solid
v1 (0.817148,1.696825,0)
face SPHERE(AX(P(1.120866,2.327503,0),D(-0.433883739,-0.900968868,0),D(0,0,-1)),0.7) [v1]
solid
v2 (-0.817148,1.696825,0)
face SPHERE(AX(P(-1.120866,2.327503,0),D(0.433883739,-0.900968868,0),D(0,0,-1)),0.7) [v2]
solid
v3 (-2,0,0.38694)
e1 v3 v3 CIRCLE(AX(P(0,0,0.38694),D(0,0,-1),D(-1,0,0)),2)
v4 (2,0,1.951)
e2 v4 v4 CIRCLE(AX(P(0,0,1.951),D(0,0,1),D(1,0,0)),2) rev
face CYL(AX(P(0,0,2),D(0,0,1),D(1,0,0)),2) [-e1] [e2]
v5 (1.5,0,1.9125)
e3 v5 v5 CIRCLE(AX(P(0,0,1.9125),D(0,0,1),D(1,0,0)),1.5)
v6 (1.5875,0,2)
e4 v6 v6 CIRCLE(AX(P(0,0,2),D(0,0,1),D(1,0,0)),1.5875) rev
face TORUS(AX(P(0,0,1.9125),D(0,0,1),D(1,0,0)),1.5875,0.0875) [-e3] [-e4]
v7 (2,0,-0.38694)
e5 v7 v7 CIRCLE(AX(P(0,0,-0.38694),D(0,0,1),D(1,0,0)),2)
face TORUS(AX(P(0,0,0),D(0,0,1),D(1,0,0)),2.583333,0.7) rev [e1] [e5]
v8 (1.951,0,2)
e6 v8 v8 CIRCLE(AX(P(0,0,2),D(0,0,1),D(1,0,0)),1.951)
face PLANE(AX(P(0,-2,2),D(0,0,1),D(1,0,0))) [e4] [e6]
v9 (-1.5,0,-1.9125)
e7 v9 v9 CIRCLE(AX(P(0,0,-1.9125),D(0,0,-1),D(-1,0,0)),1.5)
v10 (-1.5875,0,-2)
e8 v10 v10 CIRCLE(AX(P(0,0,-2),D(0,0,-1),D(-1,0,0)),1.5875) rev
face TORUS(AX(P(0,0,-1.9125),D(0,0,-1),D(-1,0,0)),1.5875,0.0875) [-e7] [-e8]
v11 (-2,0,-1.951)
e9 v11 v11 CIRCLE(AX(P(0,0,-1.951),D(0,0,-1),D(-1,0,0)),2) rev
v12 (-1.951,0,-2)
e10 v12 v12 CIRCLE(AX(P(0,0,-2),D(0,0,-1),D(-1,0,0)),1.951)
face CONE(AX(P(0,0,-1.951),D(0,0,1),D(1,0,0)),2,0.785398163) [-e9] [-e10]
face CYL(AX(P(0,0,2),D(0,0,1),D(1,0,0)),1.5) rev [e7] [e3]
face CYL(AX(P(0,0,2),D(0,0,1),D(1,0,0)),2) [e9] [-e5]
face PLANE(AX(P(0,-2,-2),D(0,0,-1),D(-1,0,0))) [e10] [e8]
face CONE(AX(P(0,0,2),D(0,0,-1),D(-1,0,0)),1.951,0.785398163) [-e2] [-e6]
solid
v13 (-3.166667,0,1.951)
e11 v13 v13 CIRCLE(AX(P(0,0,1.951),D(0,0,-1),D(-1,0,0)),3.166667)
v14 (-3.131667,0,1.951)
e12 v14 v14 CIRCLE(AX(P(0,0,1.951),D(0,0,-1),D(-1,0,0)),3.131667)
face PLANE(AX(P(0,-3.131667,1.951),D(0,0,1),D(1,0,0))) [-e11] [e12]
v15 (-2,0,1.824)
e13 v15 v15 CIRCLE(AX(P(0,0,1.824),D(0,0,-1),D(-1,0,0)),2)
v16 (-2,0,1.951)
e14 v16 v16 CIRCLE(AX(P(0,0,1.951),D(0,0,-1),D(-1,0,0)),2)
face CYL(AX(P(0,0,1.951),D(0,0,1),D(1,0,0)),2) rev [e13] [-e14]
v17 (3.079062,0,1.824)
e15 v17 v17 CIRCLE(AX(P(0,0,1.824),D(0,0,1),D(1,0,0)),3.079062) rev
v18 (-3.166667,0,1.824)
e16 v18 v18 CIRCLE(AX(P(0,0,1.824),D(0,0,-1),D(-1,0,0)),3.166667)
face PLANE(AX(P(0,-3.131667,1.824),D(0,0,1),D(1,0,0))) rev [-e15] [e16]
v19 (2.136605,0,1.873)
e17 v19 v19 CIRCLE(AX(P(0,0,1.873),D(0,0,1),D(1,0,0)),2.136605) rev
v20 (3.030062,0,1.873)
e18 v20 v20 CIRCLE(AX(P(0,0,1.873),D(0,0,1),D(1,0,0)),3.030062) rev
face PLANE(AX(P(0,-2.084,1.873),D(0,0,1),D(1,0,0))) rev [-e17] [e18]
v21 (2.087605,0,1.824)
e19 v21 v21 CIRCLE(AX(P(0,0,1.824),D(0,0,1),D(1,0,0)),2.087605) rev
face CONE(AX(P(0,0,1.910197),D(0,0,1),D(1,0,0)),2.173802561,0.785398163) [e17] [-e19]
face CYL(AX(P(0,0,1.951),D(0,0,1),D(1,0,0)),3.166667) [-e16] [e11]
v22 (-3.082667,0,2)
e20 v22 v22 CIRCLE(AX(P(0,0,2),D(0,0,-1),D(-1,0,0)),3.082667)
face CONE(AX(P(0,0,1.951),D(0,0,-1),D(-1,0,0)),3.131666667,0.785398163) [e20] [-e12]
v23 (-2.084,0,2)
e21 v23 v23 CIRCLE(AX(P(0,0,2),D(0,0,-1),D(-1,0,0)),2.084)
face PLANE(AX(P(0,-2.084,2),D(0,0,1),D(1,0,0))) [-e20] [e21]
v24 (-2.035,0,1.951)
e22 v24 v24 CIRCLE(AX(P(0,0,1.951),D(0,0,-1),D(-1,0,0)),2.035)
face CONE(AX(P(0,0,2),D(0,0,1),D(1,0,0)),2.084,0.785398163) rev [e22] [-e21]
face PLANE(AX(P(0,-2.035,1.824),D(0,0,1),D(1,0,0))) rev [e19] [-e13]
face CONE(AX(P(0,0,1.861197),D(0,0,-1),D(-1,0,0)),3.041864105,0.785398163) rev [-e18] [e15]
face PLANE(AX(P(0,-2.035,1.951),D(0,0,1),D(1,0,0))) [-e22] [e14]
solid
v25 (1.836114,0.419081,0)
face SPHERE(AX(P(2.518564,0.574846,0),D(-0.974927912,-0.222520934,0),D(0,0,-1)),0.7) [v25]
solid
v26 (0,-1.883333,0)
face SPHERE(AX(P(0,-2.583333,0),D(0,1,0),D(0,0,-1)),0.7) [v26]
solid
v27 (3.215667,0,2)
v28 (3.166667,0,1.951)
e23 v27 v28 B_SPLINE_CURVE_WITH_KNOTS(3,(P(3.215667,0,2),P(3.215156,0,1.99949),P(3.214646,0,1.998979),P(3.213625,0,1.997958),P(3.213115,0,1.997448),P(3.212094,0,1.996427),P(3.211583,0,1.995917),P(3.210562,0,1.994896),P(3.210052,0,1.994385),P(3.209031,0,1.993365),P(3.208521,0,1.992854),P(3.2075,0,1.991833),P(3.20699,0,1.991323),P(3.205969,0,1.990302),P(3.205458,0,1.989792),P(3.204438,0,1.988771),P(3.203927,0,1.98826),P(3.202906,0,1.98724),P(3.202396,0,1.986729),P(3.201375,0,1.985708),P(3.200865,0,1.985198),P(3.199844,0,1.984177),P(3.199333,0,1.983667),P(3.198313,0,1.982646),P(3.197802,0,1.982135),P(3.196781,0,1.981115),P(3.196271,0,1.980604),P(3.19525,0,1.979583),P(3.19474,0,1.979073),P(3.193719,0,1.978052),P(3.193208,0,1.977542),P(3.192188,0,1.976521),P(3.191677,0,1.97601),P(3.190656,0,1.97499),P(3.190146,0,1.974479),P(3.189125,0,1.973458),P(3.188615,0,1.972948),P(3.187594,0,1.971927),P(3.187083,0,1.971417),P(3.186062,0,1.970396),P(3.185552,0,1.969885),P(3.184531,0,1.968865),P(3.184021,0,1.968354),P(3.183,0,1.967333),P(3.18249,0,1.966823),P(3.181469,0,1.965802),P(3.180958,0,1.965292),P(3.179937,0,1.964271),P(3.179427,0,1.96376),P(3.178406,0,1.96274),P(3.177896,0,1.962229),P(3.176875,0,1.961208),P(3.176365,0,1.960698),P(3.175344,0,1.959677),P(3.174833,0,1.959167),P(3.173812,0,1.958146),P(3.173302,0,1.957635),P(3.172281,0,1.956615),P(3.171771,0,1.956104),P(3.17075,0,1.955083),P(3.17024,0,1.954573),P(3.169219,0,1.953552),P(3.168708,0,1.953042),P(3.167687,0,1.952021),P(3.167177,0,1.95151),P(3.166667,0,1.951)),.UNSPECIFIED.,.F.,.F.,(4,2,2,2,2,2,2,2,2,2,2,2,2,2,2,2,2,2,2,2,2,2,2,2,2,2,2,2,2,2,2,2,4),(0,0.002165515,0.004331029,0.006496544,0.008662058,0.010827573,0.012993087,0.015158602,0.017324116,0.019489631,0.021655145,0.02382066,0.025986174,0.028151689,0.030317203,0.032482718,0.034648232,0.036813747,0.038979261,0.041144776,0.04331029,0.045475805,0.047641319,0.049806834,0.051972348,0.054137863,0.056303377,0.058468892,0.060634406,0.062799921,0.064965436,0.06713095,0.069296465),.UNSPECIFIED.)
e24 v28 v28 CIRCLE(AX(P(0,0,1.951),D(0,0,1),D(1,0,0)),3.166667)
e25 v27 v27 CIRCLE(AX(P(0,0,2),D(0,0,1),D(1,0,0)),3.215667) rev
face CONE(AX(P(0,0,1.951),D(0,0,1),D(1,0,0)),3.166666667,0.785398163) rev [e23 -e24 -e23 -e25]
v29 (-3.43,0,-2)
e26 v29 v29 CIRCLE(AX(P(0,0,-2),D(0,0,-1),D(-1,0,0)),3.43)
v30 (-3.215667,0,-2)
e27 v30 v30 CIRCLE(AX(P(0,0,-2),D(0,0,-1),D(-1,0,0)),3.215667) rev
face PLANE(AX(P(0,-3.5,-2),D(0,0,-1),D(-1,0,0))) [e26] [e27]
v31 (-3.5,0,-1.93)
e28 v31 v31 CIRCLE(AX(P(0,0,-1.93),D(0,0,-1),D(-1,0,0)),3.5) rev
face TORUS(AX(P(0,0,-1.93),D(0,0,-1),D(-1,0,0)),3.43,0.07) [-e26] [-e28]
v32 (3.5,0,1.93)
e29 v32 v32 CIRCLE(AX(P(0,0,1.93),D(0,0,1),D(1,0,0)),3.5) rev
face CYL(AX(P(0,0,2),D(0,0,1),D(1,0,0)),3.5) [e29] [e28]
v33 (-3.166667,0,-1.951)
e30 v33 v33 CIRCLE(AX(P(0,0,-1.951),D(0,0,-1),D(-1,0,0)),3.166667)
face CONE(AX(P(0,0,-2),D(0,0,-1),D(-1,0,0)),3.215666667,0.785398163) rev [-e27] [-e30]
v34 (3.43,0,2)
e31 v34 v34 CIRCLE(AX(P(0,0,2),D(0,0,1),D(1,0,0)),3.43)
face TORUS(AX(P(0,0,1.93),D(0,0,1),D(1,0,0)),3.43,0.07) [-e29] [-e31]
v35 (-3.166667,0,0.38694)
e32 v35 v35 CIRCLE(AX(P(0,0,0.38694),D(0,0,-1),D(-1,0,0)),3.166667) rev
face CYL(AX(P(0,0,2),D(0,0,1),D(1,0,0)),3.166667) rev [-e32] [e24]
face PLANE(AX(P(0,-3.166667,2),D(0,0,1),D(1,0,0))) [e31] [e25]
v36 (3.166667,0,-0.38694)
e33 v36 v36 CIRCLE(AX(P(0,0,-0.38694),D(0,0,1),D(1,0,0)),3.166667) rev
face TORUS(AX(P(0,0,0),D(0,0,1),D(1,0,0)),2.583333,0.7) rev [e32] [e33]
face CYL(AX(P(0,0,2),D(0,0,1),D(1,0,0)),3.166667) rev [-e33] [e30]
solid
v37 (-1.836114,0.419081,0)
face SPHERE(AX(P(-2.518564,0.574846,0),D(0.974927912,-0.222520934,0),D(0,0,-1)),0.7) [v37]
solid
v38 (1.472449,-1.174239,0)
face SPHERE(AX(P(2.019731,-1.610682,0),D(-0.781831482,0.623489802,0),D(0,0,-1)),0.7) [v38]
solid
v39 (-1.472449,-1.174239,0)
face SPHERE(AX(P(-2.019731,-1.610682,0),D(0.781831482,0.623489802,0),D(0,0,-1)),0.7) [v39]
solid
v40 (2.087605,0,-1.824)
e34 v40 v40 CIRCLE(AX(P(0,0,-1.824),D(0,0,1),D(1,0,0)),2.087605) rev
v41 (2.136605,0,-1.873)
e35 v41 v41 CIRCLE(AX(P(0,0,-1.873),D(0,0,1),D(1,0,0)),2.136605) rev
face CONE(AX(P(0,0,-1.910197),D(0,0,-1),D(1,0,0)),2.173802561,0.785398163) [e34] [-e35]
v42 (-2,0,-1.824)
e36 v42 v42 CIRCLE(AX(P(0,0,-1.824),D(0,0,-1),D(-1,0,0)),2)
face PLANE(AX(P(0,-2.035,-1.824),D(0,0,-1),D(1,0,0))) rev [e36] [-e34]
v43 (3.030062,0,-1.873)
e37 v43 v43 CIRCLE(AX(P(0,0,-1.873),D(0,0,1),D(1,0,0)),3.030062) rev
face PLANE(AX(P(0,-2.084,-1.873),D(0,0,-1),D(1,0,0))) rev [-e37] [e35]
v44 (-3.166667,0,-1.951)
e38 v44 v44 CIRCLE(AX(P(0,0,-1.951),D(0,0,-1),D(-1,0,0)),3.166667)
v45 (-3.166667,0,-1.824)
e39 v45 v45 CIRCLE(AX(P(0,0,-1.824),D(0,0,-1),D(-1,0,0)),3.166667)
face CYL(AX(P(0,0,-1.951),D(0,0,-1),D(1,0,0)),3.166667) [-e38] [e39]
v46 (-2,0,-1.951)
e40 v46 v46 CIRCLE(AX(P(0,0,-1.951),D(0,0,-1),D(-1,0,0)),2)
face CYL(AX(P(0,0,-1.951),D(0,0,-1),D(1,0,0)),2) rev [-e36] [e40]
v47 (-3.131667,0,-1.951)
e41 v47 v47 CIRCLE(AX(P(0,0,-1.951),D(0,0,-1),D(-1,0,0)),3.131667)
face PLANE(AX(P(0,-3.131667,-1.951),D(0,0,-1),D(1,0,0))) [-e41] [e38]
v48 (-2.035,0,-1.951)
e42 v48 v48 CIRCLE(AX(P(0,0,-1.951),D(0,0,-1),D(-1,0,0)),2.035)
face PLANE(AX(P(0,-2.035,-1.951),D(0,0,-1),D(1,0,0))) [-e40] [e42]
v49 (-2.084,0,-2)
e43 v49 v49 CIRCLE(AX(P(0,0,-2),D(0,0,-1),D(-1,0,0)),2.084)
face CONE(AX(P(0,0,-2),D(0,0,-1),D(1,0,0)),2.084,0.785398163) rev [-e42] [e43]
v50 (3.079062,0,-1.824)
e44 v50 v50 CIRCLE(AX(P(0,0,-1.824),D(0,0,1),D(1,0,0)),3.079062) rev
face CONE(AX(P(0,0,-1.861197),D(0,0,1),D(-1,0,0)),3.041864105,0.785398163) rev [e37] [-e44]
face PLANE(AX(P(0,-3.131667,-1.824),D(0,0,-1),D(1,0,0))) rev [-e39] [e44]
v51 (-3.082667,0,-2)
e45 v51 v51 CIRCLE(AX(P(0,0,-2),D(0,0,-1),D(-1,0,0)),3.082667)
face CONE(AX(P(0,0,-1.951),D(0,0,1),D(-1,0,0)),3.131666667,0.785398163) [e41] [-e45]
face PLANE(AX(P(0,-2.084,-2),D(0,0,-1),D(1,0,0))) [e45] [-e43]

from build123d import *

# Parameters (mm, degrees)
SKETCH3_W         = 4
SKETCH3_H         = 0.333333333
SKETCH3_H_2       = 0.5
SKETCH4_R         = 0.7
CIRPATTERN1_COUNT = 7
FILLET1_R         = 0.07
FILLET2_R         = 0.0875
CHAMFER1_SIZE     = 0.049
CHAMFER2_SIZE     = 0.049


# Read off the part's stored shape, not the designer's step: Thicken1
with BuildPart() as part:
    # Sketch3 → Revolve1 (revolve)
    with BuildSketch(Plane(origin=(0, 0, 0), x_dir=(0, 0, -1), z_dir=(1, 0, 0)), mode=Mode.PRIVATE) as revolve1_sk:
        with Locations((0, -3.333333334)):
            Rectangle(SKETCH3_W, SKETCH3_H)
        with Locations((0, -1.75)):
            Rectangle(SKETCH3_W, SKETCH3_H_2)
    revolve(revolve1_sk.sketch.rotate(Axis((0, 0, 2), (0, 0, -1)), 270), axis=Axis((0, 0, 2), (0, 0, -1)))

    # Sketch4 → Cut-Revolve1 (revolve, cut)
    with BuildSketch(Plane(origin=(0, 0, 0), x_dir=(0, 0, -1), z_dir=(1, 0, 0)), mode=Mode.PRIVATE) as cut_revolve1_sk:
        with Locations((0, -2.583333333)):
            Circle(SKETCH4_R)
    revolve(cut_revolve1_sk.sketch.rotate(Axis((0, 0, 2), (0, 0, -1)), 270), axis=Axis((0, 0, 2), (0, 0, -1)), mode=Mode.SUBTRACT)

    # Fillet1
    fillet1_edges = [part.edges().sort_by_distance(p)[0] for p in [
        (-3.5, 0, -2),
        (-3.5, 0, 2),
    ]]
    fillet(fillet1_edges, radius=FILLET1_R)

    # Fillet2
    fillet2_edges = [part.edges().sort_by_distance(p)[0] for p in [
        (-1.5, 0, -2),
        (-1.5, 0, 2),
    ]]
    fillet(fillet2_edges, radius=FILLET2_R)

    # Chamfer1
    chamfer1_edges = [part.edges().sort_by_distance(p)[0] for p in [
        (-3.166666667, 0, 2),
        (-3.166666667, 0, -2),
    ]]
    chamfer(chamfer1_edges, length=CHAMFER1_SIZE)

    # Chamfer2
    chamfer2_edges = [part.edges().sort_by_distance(p)[0] for p in [
        (-2, 0, 2),
        (-2, 0, -2),
    ]]
    chamfer(chamfer2_edges, length=CHAMFER2_SIZE)


with BuildPart() as body_2:
    # Sketch5 → Revolve2 (revolve)
    with BuildSketch(Plane(origin=(0, 0, 0), x_dir=(0, 0, -1), z_dir=(1, 0, 0))):
        with BuildLine():
            Line((0, -1.883333333), (0, -3.283333333))
            ThreePointArc((0, -3.283333333), (0.7, -2.583333333), (0, -1.883333333))
        make_face()
    revolve(axis=Axis((0, -1.883333333, 0), (0, -1, 0)))


with BuildPart() as cirpattern1_1:
    # CirPattern1: pattern copy
    add(body_2.part.rotate(Axis((0, 0, 0), (0, 0, 1)), 1 * 360 / CIRPATTERN1_COUNT))


with BuildPart() as cirpattern1_2:
    # CirPattern1: pattern copy
    add(body_2.part.rotate(Axis((0, 0, 0), (0, 0, 1)), 2 * 360 / CIRPATTERN1_COUNT))


with BuildPart() as cirpattern1_3:
    # CirPattern1: pattern copy
    add(body_2.part.rotate(Axis((0, 0, 0), (0, 0, 1)), 3 * 360 / CIRPATTERN1_COUNT))


with BuildPart() as cirpattern1_4:
    # CirPattern1: pattern copy
    add(body_2.part.rotate(Axis((0, 0, 0), (0, 0, 1)), 4 * 360 / CIRPATTERN1_COUNT))


with BuildPart() as cirpattern1_5:
    # CirPattern1: pattern copy
    add(body_2.part.rotate(Axis((0, 0, 0), (0, 0, 1)), 5 * 360 / CIRPATTERN1_COUNT))


with BuildPart() as cirpattern1_6:
    # CirPattern1: pattern copy
    add(body_2.part.rotate(Axis((0, 0, 0), (0, 0, 1)), 6 * 360 / CIRPATTERN1_COUNT))


with BuildPart() as body_9:
    # Thicken1 outline → Thicken1 (revolve)
    with BuildSketch(Plane.XZ):
        Polygon((2, 1.951), (2, 1.824), (2.087605122, 1.824), (2.136605122, 1.873), (3.030061544, 1.873), (3.079061544, 1.824), (3.166666667, 1.824), (3.166666667, 1.951), (3.131666667, 1.951), (3.082666667, 2), (2.084, 2), (2.035, 1.951), align=None)
    revolve(axis=Axis((0, 0, 0), (0, 0, 1)))


with BuildPart() as body_10:
    # Mirror1: mirrored copy
    add(body_9.part.mirror(Plane.XY))


solid = Compound([part.part, body_2.part, cirpattern1_1.part, cirpattern1_2.part, cirpattern1_3.part, cirpattern1_4.part, cirpattern1_5.part, cirpattern1_6.part, body_9.part, body_10.part])
